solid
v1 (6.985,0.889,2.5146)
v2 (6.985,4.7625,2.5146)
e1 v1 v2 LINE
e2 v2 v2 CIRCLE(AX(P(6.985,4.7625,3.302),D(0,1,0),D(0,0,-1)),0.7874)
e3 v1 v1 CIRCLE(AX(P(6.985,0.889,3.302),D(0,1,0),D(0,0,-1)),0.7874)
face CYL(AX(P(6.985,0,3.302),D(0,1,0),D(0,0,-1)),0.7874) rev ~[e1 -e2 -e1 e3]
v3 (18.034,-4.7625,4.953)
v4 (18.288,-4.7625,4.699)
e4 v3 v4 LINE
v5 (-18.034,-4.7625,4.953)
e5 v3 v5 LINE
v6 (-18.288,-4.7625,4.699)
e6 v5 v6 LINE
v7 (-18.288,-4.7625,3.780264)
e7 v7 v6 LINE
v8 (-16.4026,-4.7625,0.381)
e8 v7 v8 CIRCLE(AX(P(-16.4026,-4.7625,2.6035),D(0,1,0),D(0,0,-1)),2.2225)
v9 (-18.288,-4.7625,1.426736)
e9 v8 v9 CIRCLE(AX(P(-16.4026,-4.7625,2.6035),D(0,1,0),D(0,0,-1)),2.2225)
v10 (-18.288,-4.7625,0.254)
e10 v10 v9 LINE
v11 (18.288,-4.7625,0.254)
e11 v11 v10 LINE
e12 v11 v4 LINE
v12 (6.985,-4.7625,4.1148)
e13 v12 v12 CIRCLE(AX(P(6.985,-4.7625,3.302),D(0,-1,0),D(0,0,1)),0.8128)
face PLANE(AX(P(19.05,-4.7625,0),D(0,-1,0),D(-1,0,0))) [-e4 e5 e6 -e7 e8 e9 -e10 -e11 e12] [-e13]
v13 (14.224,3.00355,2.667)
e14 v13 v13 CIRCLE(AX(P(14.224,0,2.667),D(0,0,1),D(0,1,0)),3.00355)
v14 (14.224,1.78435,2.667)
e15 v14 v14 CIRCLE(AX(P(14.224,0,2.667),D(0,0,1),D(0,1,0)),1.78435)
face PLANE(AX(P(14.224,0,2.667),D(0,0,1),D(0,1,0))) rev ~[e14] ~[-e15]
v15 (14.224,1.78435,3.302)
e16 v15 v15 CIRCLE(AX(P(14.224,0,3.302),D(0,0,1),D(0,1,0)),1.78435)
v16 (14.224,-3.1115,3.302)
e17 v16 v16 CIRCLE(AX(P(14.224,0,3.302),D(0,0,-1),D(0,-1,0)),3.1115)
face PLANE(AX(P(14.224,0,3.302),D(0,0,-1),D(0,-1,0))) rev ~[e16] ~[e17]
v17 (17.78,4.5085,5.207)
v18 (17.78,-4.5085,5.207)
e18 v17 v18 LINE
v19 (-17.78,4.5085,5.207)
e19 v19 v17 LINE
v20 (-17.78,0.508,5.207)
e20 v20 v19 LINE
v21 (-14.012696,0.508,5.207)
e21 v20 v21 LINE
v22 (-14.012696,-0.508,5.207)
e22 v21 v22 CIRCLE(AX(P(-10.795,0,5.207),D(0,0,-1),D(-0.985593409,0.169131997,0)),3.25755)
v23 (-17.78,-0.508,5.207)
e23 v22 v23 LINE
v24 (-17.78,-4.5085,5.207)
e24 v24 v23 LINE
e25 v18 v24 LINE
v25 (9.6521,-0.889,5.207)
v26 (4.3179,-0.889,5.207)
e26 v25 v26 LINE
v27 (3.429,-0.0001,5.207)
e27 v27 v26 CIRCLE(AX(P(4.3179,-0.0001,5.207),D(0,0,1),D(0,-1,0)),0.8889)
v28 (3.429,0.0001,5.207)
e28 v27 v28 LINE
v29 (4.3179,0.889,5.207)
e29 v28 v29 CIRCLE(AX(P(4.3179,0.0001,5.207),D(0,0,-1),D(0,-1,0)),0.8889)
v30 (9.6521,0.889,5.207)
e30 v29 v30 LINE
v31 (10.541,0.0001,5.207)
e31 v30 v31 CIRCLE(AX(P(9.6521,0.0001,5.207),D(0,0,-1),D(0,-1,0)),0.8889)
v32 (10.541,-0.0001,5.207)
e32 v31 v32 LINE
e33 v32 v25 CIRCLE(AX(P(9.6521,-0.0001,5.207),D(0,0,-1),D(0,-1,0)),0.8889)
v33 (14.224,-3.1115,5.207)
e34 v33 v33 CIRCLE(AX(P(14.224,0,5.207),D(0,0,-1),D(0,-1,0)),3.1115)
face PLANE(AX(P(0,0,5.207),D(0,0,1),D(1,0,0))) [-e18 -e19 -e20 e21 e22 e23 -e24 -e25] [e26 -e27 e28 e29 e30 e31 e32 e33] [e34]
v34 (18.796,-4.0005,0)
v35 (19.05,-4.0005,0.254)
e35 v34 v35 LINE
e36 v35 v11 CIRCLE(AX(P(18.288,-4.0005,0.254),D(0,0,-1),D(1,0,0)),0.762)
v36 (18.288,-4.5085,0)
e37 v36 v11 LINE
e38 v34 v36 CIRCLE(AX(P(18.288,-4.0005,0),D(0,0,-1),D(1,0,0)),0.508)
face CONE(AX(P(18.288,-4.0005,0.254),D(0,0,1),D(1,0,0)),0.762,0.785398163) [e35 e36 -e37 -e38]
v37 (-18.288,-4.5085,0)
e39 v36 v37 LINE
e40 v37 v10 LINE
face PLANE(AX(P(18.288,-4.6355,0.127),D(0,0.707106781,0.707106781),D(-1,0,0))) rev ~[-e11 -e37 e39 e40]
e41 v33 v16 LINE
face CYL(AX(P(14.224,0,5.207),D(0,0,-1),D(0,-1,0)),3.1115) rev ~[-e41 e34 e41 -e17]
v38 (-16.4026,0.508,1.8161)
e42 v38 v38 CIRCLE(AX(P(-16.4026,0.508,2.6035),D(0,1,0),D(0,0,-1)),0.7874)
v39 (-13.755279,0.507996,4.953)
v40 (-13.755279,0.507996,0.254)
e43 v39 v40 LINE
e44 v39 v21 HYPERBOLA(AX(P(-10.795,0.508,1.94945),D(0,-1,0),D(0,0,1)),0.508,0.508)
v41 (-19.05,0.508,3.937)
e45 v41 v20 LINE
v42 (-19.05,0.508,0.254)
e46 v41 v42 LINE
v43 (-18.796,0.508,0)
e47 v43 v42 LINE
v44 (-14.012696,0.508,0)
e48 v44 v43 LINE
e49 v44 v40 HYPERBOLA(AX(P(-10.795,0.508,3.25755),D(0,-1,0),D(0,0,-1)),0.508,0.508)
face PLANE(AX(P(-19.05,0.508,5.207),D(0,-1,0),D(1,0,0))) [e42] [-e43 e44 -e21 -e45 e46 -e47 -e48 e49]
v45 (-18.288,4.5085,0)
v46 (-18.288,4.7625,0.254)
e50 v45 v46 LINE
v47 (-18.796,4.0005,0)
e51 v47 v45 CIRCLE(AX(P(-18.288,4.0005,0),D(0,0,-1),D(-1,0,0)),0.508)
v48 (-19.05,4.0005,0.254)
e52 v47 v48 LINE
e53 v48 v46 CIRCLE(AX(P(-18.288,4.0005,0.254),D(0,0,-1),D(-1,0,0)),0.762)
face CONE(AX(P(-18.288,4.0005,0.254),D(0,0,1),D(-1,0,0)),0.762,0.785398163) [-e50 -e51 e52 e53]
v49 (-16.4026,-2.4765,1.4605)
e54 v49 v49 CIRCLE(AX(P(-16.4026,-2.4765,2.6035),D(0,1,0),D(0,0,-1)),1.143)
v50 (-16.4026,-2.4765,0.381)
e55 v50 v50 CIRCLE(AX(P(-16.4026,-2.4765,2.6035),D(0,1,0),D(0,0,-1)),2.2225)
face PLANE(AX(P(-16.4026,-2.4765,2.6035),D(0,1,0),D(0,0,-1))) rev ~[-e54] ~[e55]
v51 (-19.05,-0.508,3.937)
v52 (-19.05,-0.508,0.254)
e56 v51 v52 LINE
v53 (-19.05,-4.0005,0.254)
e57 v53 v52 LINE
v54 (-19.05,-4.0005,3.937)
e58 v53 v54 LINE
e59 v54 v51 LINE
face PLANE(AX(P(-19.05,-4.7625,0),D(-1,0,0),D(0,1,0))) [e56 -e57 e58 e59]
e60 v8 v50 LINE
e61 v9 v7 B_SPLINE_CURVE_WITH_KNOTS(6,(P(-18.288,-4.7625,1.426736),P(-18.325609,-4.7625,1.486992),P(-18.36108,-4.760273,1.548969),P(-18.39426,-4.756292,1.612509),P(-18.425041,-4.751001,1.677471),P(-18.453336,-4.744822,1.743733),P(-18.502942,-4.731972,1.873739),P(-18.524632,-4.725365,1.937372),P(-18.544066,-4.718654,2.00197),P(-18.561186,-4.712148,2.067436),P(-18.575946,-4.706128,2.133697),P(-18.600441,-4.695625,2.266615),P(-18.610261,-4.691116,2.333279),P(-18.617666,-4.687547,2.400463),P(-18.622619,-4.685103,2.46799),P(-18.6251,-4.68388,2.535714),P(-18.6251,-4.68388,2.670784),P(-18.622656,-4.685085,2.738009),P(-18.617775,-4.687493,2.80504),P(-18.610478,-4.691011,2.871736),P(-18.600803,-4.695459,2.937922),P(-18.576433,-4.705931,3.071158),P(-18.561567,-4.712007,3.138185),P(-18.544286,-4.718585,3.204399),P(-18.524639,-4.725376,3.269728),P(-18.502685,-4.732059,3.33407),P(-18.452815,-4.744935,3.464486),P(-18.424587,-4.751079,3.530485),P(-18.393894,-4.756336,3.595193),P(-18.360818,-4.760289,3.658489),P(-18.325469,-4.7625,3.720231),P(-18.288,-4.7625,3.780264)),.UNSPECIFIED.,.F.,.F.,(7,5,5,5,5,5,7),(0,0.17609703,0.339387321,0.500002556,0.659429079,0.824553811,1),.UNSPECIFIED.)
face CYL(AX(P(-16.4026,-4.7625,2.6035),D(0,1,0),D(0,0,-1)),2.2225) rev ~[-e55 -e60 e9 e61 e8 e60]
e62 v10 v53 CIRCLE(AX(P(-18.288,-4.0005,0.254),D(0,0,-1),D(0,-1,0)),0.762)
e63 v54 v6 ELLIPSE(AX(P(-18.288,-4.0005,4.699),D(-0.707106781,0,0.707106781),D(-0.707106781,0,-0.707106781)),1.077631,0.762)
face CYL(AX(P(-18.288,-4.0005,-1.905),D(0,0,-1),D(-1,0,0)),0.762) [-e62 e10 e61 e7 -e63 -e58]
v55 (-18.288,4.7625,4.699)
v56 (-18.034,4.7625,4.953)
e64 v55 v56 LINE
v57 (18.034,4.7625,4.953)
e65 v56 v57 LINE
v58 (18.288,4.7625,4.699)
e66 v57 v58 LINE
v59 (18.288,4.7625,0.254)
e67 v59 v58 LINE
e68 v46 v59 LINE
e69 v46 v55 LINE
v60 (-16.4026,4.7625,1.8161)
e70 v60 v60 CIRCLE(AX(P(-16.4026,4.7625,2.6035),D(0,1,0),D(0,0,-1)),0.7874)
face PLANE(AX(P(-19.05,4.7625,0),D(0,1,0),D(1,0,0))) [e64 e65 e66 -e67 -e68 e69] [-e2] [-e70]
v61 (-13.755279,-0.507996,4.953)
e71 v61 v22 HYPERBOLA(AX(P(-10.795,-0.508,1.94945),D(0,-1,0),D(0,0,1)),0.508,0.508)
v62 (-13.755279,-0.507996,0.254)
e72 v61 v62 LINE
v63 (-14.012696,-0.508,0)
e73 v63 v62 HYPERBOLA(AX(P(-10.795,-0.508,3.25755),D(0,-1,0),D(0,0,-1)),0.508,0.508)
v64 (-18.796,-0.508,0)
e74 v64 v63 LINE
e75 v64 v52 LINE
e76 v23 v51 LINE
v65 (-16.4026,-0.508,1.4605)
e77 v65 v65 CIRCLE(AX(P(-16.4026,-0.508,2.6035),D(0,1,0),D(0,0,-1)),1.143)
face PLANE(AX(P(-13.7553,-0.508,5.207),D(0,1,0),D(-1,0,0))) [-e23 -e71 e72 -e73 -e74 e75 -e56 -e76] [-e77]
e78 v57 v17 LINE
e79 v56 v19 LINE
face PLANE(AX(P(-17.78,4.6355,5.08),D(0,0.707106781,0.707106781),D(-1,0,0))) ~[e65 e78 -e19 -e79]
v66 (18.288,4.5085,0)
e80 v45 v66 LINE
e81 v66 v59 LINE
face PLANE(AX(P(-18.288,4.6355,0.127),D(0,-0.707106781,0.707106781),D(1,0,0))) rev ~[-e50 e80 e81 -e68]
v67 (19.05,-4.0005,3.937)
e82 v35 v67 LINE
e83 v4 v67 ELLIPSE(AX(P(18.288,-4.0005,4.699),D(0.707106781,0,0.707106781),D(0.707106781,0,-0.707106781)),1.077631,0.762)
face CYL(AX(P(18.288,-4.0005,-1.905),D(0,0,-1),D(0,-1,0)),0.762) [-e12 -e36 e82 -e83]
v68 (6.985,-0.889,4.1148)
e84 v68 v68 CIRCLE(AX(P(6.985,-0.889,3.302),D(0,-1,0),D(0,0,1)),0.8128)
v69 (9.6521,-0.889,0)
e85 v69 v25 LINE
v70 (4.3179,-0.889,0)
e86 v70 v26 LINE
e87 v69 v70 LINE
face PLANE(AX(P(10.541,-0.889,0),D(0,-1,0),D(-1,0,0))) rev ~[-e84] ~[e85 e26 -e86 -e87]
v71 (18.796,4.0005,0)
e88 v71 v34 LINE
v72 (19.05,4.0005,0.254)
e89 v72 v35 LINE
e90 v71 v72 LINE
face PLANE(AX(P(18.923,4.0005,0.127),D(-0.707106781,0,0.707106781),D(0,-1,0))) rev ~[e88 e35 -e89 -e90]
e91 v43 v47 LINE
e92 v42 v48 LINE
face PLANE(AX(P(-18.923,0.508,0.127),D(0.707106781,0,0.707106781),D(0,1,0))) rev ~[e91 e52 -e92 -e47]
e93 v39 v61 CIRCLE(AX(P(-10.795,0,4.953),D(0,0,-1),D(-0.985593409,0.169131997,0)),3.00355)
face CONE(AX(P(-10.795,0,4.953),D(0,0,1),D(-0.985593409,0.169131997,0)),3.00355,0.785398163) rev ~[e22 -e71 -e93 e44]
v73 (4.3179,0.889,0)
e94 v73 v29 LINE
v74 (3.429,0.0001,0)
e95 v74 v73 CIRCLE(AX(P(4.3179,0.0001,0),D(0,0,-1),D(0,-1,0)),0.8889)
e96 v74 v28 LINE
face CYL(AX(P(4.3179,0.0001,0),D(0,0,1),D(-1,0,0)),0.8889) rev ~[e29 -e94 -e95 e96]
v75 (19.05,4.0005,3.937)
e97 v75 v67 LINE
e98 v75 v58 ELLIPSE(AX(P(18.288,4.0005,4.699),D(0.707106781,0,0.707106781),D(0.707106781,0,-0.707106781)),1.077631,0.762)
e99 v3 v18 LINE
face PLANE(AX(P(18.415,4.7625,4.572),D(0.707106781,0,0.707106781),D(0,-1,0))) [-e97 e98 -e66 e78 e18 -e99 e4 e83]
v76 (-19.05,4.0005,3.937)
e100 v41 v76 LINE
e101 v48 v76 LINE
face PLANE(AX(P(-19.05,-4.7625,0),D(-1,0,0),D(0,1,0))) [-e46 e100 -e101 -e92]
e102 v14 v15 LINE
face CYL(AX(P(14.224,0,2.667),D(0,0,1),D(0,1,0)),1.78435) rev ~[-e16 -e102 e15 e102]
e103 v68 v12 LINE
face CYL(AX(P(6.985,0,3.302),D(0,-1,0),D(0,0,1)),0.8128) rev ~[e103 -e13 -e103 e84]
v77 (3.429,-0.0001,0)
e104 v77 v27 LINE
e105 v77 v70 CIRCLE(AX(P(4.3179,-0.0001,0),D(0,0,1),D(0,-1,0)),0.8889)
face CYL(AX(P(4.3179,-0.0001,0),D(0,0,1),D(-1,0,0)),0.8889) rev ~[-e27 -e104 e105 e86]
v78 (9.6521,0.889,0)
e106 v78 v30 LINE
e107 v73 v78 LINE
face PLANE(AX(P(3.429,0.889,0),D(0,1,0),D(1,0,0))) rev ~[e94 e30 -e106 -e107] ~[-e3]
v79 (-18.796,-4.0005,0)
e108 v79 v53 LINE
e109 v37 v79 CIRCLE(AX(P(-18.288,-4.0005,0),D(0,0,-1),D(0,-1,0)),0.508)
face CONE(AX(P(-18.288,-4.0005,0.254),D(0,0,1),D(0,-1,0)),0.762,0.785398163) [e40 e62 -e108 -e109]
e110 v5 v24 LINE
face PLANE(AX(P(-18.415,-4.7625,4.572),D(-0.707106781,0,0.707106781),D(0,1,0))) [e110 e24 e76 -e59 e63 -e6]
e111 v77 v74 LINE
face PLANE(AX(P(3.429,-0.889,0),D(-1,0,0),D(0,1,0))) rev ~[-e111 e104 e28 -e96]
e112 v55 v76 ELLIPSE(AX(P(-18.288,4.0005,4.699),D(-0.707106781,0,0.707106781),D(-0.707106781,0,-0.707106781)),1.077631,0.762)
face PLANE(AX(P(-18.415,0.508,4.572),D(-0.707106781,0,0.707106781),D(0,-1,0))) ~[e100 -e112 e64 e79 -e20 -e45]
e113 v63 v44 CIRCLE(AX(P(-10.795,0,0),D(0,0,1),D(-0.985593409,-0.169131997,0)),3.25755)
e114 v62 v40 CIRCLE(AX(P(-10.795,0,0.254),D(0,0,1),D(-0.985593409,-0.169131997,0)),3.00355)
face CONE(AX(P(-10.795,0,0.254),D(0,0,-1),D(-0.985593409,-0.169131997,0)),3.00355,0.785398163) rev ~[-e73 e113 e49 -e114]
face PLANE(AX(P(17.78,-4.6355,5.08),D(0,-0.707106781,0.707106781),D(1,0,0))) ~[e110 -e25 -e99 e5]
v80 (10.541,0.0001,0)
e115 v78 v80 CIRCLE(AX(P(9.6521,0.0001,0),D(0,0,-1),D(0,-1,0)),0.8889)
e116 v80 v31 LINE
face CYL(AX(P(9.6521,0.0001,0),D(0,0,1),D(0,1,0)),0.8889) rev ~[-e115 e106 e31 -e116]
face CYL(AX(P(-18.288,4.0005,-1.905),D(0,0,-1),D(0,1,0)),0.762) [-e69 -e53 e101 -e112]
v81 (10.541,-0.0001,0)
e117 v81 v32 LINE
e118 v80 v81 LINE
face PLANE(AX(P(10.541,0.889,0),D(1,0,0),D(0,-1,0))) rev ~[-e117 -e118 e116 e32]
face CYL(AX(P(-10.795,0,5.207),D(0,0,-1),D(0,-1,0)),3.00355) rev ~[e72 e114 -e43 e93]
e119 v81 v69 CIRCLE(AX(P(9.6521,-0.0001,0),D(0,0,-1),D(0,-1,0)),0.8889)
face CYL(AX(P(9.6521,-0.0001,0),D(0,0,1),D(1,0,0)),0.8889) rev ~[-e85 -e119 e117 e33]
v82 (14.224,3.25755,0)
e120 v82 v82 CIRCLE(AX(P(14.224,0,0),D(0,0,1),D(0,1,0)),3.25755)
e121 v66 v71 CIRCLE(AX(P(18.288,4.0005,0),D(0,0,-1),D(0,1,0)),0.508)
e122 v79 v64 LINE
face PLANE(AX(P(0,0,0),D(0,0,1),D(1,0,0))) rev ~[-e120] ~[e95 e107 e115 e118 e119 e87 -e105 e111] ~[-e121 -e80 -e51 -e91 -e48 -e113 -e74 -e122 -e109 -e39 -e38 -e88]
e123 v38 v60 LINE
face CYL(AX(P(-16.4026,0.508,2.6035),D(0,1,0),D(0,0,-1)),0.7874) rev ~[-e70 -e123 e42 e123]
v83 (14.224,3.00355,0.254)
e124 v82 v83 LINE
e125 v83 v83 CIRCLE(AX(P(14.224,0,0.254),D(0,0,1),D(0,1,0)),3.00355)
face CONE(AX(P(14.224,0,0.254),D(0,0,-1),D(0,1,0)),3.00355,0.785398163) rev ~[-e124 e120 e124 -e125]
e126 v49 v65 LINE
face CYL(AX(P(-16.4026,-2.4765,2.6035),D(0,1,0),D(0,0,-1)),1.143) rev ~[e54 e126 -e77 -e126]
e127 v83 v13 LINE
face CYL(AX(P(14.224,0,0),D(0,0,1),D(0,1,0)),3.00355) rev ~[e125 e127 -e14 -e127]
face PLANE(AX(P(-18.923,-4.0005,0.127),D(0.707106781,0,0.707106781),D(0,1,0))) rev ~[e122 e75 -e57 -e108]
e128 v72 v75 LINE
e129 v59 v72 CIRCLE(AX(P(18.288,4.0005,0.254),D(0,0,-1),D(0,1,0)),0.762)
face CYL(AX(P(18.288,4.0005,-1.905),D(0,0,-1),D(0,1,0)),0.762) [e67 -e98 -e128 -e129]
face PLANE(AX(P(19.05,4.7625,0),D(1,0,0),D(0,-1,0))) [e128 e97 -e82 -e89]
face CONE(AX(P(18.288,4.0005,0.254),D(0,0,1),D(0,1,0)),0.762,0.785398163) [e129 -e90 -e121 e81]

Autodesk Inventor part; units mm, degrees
ref_plane "YZ Plane" through (0, 0, 0) normal (1, 0, 0) x (0, 1, 0)
ref_plane "XZ Plane" through (0, 0, 0) normal (0, 1, 0) x (-1, 0, 0)
ref_plane "XY Plane" through (0, 0, 0) normal (0, 0, 1) x (1, 0, 0)
sketch "Sketch1" plane through (0, 0, 0) normal (0, 0, 1) x (1, 0, 0)
  line L0 (-19.05, 4.7625) -> (19.05, 4.7625)
  line L1 (19.05, 4.7625) -> (19.05, -4.7625)
  line L2 (19.05, -4.7625) -> (-19.05, -4.7625)
  line L3 (-19.05, -4.7625) -> (-19.05, 4.7625)
  point P0 (0, 0)
  point P1 (-19.05, 0)
  point P2 (0, 4.7625)
  dimension "d0" = 38.1
  dimension "d1" = 9.525
extrude "Extrusion1" add sketch "Sketch1" along normal blind 5.207
sketch "Sketch2" plane through (0, 0, 5.207) normal (0, 0, 1) x (1, 0, 0)
  line L0 (-19.05, -4.7625) -> (-19.05, 4.7625) projected
  point P0 (0, 0)
  point P1 (-10.795, 0)
  dimension "d4" = 8.255
hole "Hole1" at (-10.795, 0, 5.207) direction (0, 0, -1) diameter 6.0071 end through all
sketch "Sketch4" plane through (0, 0, 0) normal (1, 0, 0) x (0, 1, 0)
  circle A0 centre (0, 4.1099) radius 1.778
  point P0 (0, 0)
  dimension "d18" = 3.556
sketch "Sketch8" plane through (0, 0, 0) normal (0, 0, -1) x (-1, 0, 0)
  circle A0 centre (10.795, 0) radius 3.0035 projected
  circle A1 centre (10.795, 0) radius 4.7625 construction
  circle A2 centre (10.795, 0) radius 3.1115
  line L0 (-19.05, 4.7625) -> (-19.05, -4.7625) projected
  line L1 (19.05, 4.7625) -> (-19.05, 4.7625) projected
  line L2 (-19.05, -4.7625) -> (19.05, -4.7625) projected
  line L3 (19.05, -4.7625) -> (19.05, 4.7625) projected
  line L4 (-19.05, 4.7625) -> (19.05, 4.7625)
  line L5 (19.05, 4.7625) -> (19.05, -4.7625)
  line L6 (19.05, -4.7625) -> (-19.05, -4.7625)
  line L7 (-19.05, -4.7625) -> (-19.05, 4.7625)
  point P0 (17.78, -4.7625)
  point P1 (17.78, 4.7625)
  point P2 (0, 0)
  dimension "d52" = 9.525
  dimension "d53" = 6.223
extrude "Extrusion4" [suppressed]
sketch "Sketch9" plane through (0, 0, 0) normal (0, 0, 1) x (1, 0, 0)
  line L0 (3.429, 0.889) -> (10.541, 0.889)
  line L1 (10.541, 0.889) -> (10.541, -0.889)
  line L2 (10.541, -0.889) -> (3.429, -0.889)
  line L3 (3.429, -0.889) -> (3.429, 0.889)
  line L4 (10.541, 0) -> (3.429, 0) construction
  line L5 (6.985, 0.889) -> (6.985, -0.889) construction
  circle A0 centre (-10.795, 0) radius 3.0035 projected
  point P0 (0, 0)
  dimension "d60" = 7.112
  dimension "d61" = 1.778
  dimension "d130" = 17.78
extrude "Extrusion5" cut sketch "Sketch9" along normal up to next contours L0 L1 L2 L3
sketch "Sketch11" plane through (0, 0, 0) normal (0, 0, 1) x (1, 0, 0)
  line L0 (-26.67, 0) -> (26.67, 0) projected
  circle A0 centre (-10.795, 0) radius 3.0035 projected
  point P0 (0, 0)
  point P1 (14.224, 0)
  dimension "d131" = 25.019
hole "Hole5" at (14.224, 0, 0) direction (0, 0, 1) diameter 3.5687 end through all counterbore diameter 6.0071 counterbore depth 2.667
sketch "Sketch13" plane through (0, 0, 0) normal (0, 1, 0) x (-1, 0, 0)
  line L0 (-10.541, 0) -> (-10.541, 5.207) projected
  line L1 (-3.429, 0) -> (-3.429, 5.207) projected
  line L2 (-10.541, 5.207) -> (-3.429, 5.207) construction
  line L3 (-6.985, 5.207) -> (-6.985, 3.302) construction
  point P0 (0, 0)
  point P1 (-8.89, 0.381)
  point P2 (-1.27, 0.381)
  dimension "d98" = 1.905
hole "Hole6" at (6.985, 0, 3.302) direction (0, -1, 0) diameter 1.6256 end through all
hole "Hole7" at (6.985, 0, 3.302) direction (0, 1, 0) diameter 1.5748 end through all
sketch "Sketch18" plane through (0, 0, 5.207) normal (0, 0, 1) x (1, 0, 0)
  circle A0 centre (-10.795, 0) radius 3.0035 projected
  line L0 (-19.05, -4.7625) -> (-19.05, 4.7625) projected
  line L1 (-19.05, 0.508) -> (-13.7553, 0.508)
  line L2 (-13.7553, 0.508) -> (-13.7553, -0.508)
  line L3 (-13.7553, -0.508) -> (-19.05, -0.508)
  line L4 (-19.05, -0.508) -> (-19.05, 0.508)
  line L5 (-19.05, 0) -> (-13.7553, 0) construction
  point P0 (0, 0)
  point P1 (-19.05, 0)
  dimension "d132" = 1.016
extrude "Extrusion7" cut sketch "Sketch18" against normal up to next contours L2 A0 | A0 L3 L0 L1 picked at (-13.7681, 0.0567)
sketch "Sketch19" plane through (-19.05, -4.7625, 0) normal (0, -1, 0) x (1, 0, 0)
  line L0 (38.1, 5.207) -> (0, 5.207) projected
  line L1 (0, 0) -> (0, 5.207) projected
  line L2 (5.2947, 0) -> (5.2947, 5.207) construction
  line L3 (0, 2.6035) -> (5.2947, 2.6035) construction
  line L4 (2.6474, 2.6035) -> (2.6474, 5.207) construction
  circle A0 centre (2.6474, 2.6035) radius 2.2225 construction
  point P0 (19.05, 0)
  dimension "d136" = 0
  dimension "d137" = 4.445
hole "Hole9" at (-16.4026, -4.7625, 2.6035) direction (0, 1, 0) diameter 2.286 end up to surface counterbore diameter 4.445 counterbore depth 2.286
hole "Hole10" at (-16.4026, 0.508, 2.6035) direction (0, 1, 0) diameter 1.5748 end through all
sketch "Sketch20" plane through (0, 0, 5.207) normal (0, 0, 1) x (1, 0, 0)
  circle A0 centre (14.224, 0) radius 1.7844 projected
  point P0 (0, 0)
hole "Hole11" at (14.224, 0, 5.207) direction (0, 0, -1) diameter 6.223 depth 1.905
chamfer "Chamfer9" distance 1.27 angle 45 3 edges at (19.05, 0, 5.207) (-19.05, 2.6352, 5.207) (-19.05, -2.6353, 5.207)
sketch "Sketch15" plane through (0, 0, 0) normal (1, 0, 0) x (0, 1, 0)
  point P0 (0, 0)
sketch "Sketch16" plane through (0, 0, 5.207) normal (0, 0, 1) x (1, 0, 0)
  circle A0 centre (14.224, 0) radius 1.7844 projected
  line L0 (10.541, 0.889) -> (10.541, -0.889) projected
  line L1 (10.541, -0.889) -> (3.429, -0.889) projected
  line L2 (3.429, -0.889) -> (3.429, 0.889) projected
  line L3 (3.429, 0.889) -> (10.541, 0.889) projected
  circle A1 centre (-12.7, 0) radius 3.0035 projected
  line L4 (19.05, 4.7625) -> (19.05, -4.7625) projected
  line L5 (-19.05, 4.7625) -> (19.05, 4.7625) projected
  line L6 (-19.05, -4.7625) -> (-19.05, 4.7625) projected
  line L7 (19.05, -4.7625) -> (-19.05, -4.7625) projected
  point P0 (0, 0)
sketch "Sketch14" plane through (0, 0, 5.207) normal (0, 0, 1) x (1, 0, 0)
  circle A0 centre (6.985, 0) radius 4.1275
  line L0 (10.541, 0.889) -> (10.541, -0.889) projected
  line L1 (10.541, -0.889) -> (3.429, -0.889) projected
  line L2 (3.429, -0.889) -> (3.429, 0.889) projected
  line L3 (3.429, 0.889) -> (10.541, 0.889) projected
  line L4 (-17.78, 4.7625) -> (17.78, 4.7625) projected
  line L5 (17.78, -4.7625) -> (-17.78, -4.7625) projected
  line L6 (6.1976, 0.889) -> (6.1976, 4.7625) projected
  line L7 (7.7724, 0.889) -> (7.7724, 4.7625) projected
  line L8 (6.1976, 4.7625) -> (7.7724, 4.7625) construction
  line L9 (6.985, 4.7625) -> (6.985, -4.7625) construction
  line L10 (-13.7553, -0.508) -> (-17.78, -0.508) projected
  line L11 (-17.78, 0.508) -> (-13.7553, 0.508) projected
  arc A1 (-13.7553, -0.508) -> (-13.7553, 0.508) centre (-10.795, 0) ccw projected
  line L12 (17.78, 4.7625) -> (17.78, -4.7625) projected
  line L13 (-17.78, -4.7625) -> (-17.78, -0.508) projected
  line L14 (-17.78, 0.508) -> (-17.78, 4.7625) projected
  point P0 (0, 0)
  dimension "d113" = 8.255
extrude "Extrusion6" [suppressed]
fillet "Fillet4" radius 0.889 4 edges at (10.541, 0.889, 2.6035) (10.541, -0.889, 2.6035) (3.429, 0.889, 2.6035) (3.429, -0.889, 2.6035)
fillet "Fillet5" radius 0.762 4 edges at (-19.05, 4.7625, 1.9685) (-19.05, -4.7625, 1.9685) (19.05, 4.7625, 1.9685) (19.05, -4.7625, 1.9685)
chamfer "Chamfer5" distance 0.254 angle 45 11 edges at (0, 4.7625, 5.207) (0, -4.7625, 5.207) (-19.05, -2.2543, 0) (-18.8268, -4.5393, 0) (0, -4.7625, 0) (18.8268, -4.5393, 0) (19.05, 0, 0) (18.8268, 4.5393, 0) (0, 4.7625, 0) (-18.8268, 4.5393, 0) (-19.05, 2.2542, 0)
sketch "Sketch12" plane through (0, 0, 0) normal (0, 1, 0) x (-1, 0, 0)
  point P0 (0, 0)
chamfer "Chamfer8" distance 0.254 angle 45 3 edges at (-7.7914, 0, 0) (14.224, -3.0035, 0) (-7.7914, 0, 5.207)
properties part number "J002886" material "ALUMINUM, 6061-T651"
